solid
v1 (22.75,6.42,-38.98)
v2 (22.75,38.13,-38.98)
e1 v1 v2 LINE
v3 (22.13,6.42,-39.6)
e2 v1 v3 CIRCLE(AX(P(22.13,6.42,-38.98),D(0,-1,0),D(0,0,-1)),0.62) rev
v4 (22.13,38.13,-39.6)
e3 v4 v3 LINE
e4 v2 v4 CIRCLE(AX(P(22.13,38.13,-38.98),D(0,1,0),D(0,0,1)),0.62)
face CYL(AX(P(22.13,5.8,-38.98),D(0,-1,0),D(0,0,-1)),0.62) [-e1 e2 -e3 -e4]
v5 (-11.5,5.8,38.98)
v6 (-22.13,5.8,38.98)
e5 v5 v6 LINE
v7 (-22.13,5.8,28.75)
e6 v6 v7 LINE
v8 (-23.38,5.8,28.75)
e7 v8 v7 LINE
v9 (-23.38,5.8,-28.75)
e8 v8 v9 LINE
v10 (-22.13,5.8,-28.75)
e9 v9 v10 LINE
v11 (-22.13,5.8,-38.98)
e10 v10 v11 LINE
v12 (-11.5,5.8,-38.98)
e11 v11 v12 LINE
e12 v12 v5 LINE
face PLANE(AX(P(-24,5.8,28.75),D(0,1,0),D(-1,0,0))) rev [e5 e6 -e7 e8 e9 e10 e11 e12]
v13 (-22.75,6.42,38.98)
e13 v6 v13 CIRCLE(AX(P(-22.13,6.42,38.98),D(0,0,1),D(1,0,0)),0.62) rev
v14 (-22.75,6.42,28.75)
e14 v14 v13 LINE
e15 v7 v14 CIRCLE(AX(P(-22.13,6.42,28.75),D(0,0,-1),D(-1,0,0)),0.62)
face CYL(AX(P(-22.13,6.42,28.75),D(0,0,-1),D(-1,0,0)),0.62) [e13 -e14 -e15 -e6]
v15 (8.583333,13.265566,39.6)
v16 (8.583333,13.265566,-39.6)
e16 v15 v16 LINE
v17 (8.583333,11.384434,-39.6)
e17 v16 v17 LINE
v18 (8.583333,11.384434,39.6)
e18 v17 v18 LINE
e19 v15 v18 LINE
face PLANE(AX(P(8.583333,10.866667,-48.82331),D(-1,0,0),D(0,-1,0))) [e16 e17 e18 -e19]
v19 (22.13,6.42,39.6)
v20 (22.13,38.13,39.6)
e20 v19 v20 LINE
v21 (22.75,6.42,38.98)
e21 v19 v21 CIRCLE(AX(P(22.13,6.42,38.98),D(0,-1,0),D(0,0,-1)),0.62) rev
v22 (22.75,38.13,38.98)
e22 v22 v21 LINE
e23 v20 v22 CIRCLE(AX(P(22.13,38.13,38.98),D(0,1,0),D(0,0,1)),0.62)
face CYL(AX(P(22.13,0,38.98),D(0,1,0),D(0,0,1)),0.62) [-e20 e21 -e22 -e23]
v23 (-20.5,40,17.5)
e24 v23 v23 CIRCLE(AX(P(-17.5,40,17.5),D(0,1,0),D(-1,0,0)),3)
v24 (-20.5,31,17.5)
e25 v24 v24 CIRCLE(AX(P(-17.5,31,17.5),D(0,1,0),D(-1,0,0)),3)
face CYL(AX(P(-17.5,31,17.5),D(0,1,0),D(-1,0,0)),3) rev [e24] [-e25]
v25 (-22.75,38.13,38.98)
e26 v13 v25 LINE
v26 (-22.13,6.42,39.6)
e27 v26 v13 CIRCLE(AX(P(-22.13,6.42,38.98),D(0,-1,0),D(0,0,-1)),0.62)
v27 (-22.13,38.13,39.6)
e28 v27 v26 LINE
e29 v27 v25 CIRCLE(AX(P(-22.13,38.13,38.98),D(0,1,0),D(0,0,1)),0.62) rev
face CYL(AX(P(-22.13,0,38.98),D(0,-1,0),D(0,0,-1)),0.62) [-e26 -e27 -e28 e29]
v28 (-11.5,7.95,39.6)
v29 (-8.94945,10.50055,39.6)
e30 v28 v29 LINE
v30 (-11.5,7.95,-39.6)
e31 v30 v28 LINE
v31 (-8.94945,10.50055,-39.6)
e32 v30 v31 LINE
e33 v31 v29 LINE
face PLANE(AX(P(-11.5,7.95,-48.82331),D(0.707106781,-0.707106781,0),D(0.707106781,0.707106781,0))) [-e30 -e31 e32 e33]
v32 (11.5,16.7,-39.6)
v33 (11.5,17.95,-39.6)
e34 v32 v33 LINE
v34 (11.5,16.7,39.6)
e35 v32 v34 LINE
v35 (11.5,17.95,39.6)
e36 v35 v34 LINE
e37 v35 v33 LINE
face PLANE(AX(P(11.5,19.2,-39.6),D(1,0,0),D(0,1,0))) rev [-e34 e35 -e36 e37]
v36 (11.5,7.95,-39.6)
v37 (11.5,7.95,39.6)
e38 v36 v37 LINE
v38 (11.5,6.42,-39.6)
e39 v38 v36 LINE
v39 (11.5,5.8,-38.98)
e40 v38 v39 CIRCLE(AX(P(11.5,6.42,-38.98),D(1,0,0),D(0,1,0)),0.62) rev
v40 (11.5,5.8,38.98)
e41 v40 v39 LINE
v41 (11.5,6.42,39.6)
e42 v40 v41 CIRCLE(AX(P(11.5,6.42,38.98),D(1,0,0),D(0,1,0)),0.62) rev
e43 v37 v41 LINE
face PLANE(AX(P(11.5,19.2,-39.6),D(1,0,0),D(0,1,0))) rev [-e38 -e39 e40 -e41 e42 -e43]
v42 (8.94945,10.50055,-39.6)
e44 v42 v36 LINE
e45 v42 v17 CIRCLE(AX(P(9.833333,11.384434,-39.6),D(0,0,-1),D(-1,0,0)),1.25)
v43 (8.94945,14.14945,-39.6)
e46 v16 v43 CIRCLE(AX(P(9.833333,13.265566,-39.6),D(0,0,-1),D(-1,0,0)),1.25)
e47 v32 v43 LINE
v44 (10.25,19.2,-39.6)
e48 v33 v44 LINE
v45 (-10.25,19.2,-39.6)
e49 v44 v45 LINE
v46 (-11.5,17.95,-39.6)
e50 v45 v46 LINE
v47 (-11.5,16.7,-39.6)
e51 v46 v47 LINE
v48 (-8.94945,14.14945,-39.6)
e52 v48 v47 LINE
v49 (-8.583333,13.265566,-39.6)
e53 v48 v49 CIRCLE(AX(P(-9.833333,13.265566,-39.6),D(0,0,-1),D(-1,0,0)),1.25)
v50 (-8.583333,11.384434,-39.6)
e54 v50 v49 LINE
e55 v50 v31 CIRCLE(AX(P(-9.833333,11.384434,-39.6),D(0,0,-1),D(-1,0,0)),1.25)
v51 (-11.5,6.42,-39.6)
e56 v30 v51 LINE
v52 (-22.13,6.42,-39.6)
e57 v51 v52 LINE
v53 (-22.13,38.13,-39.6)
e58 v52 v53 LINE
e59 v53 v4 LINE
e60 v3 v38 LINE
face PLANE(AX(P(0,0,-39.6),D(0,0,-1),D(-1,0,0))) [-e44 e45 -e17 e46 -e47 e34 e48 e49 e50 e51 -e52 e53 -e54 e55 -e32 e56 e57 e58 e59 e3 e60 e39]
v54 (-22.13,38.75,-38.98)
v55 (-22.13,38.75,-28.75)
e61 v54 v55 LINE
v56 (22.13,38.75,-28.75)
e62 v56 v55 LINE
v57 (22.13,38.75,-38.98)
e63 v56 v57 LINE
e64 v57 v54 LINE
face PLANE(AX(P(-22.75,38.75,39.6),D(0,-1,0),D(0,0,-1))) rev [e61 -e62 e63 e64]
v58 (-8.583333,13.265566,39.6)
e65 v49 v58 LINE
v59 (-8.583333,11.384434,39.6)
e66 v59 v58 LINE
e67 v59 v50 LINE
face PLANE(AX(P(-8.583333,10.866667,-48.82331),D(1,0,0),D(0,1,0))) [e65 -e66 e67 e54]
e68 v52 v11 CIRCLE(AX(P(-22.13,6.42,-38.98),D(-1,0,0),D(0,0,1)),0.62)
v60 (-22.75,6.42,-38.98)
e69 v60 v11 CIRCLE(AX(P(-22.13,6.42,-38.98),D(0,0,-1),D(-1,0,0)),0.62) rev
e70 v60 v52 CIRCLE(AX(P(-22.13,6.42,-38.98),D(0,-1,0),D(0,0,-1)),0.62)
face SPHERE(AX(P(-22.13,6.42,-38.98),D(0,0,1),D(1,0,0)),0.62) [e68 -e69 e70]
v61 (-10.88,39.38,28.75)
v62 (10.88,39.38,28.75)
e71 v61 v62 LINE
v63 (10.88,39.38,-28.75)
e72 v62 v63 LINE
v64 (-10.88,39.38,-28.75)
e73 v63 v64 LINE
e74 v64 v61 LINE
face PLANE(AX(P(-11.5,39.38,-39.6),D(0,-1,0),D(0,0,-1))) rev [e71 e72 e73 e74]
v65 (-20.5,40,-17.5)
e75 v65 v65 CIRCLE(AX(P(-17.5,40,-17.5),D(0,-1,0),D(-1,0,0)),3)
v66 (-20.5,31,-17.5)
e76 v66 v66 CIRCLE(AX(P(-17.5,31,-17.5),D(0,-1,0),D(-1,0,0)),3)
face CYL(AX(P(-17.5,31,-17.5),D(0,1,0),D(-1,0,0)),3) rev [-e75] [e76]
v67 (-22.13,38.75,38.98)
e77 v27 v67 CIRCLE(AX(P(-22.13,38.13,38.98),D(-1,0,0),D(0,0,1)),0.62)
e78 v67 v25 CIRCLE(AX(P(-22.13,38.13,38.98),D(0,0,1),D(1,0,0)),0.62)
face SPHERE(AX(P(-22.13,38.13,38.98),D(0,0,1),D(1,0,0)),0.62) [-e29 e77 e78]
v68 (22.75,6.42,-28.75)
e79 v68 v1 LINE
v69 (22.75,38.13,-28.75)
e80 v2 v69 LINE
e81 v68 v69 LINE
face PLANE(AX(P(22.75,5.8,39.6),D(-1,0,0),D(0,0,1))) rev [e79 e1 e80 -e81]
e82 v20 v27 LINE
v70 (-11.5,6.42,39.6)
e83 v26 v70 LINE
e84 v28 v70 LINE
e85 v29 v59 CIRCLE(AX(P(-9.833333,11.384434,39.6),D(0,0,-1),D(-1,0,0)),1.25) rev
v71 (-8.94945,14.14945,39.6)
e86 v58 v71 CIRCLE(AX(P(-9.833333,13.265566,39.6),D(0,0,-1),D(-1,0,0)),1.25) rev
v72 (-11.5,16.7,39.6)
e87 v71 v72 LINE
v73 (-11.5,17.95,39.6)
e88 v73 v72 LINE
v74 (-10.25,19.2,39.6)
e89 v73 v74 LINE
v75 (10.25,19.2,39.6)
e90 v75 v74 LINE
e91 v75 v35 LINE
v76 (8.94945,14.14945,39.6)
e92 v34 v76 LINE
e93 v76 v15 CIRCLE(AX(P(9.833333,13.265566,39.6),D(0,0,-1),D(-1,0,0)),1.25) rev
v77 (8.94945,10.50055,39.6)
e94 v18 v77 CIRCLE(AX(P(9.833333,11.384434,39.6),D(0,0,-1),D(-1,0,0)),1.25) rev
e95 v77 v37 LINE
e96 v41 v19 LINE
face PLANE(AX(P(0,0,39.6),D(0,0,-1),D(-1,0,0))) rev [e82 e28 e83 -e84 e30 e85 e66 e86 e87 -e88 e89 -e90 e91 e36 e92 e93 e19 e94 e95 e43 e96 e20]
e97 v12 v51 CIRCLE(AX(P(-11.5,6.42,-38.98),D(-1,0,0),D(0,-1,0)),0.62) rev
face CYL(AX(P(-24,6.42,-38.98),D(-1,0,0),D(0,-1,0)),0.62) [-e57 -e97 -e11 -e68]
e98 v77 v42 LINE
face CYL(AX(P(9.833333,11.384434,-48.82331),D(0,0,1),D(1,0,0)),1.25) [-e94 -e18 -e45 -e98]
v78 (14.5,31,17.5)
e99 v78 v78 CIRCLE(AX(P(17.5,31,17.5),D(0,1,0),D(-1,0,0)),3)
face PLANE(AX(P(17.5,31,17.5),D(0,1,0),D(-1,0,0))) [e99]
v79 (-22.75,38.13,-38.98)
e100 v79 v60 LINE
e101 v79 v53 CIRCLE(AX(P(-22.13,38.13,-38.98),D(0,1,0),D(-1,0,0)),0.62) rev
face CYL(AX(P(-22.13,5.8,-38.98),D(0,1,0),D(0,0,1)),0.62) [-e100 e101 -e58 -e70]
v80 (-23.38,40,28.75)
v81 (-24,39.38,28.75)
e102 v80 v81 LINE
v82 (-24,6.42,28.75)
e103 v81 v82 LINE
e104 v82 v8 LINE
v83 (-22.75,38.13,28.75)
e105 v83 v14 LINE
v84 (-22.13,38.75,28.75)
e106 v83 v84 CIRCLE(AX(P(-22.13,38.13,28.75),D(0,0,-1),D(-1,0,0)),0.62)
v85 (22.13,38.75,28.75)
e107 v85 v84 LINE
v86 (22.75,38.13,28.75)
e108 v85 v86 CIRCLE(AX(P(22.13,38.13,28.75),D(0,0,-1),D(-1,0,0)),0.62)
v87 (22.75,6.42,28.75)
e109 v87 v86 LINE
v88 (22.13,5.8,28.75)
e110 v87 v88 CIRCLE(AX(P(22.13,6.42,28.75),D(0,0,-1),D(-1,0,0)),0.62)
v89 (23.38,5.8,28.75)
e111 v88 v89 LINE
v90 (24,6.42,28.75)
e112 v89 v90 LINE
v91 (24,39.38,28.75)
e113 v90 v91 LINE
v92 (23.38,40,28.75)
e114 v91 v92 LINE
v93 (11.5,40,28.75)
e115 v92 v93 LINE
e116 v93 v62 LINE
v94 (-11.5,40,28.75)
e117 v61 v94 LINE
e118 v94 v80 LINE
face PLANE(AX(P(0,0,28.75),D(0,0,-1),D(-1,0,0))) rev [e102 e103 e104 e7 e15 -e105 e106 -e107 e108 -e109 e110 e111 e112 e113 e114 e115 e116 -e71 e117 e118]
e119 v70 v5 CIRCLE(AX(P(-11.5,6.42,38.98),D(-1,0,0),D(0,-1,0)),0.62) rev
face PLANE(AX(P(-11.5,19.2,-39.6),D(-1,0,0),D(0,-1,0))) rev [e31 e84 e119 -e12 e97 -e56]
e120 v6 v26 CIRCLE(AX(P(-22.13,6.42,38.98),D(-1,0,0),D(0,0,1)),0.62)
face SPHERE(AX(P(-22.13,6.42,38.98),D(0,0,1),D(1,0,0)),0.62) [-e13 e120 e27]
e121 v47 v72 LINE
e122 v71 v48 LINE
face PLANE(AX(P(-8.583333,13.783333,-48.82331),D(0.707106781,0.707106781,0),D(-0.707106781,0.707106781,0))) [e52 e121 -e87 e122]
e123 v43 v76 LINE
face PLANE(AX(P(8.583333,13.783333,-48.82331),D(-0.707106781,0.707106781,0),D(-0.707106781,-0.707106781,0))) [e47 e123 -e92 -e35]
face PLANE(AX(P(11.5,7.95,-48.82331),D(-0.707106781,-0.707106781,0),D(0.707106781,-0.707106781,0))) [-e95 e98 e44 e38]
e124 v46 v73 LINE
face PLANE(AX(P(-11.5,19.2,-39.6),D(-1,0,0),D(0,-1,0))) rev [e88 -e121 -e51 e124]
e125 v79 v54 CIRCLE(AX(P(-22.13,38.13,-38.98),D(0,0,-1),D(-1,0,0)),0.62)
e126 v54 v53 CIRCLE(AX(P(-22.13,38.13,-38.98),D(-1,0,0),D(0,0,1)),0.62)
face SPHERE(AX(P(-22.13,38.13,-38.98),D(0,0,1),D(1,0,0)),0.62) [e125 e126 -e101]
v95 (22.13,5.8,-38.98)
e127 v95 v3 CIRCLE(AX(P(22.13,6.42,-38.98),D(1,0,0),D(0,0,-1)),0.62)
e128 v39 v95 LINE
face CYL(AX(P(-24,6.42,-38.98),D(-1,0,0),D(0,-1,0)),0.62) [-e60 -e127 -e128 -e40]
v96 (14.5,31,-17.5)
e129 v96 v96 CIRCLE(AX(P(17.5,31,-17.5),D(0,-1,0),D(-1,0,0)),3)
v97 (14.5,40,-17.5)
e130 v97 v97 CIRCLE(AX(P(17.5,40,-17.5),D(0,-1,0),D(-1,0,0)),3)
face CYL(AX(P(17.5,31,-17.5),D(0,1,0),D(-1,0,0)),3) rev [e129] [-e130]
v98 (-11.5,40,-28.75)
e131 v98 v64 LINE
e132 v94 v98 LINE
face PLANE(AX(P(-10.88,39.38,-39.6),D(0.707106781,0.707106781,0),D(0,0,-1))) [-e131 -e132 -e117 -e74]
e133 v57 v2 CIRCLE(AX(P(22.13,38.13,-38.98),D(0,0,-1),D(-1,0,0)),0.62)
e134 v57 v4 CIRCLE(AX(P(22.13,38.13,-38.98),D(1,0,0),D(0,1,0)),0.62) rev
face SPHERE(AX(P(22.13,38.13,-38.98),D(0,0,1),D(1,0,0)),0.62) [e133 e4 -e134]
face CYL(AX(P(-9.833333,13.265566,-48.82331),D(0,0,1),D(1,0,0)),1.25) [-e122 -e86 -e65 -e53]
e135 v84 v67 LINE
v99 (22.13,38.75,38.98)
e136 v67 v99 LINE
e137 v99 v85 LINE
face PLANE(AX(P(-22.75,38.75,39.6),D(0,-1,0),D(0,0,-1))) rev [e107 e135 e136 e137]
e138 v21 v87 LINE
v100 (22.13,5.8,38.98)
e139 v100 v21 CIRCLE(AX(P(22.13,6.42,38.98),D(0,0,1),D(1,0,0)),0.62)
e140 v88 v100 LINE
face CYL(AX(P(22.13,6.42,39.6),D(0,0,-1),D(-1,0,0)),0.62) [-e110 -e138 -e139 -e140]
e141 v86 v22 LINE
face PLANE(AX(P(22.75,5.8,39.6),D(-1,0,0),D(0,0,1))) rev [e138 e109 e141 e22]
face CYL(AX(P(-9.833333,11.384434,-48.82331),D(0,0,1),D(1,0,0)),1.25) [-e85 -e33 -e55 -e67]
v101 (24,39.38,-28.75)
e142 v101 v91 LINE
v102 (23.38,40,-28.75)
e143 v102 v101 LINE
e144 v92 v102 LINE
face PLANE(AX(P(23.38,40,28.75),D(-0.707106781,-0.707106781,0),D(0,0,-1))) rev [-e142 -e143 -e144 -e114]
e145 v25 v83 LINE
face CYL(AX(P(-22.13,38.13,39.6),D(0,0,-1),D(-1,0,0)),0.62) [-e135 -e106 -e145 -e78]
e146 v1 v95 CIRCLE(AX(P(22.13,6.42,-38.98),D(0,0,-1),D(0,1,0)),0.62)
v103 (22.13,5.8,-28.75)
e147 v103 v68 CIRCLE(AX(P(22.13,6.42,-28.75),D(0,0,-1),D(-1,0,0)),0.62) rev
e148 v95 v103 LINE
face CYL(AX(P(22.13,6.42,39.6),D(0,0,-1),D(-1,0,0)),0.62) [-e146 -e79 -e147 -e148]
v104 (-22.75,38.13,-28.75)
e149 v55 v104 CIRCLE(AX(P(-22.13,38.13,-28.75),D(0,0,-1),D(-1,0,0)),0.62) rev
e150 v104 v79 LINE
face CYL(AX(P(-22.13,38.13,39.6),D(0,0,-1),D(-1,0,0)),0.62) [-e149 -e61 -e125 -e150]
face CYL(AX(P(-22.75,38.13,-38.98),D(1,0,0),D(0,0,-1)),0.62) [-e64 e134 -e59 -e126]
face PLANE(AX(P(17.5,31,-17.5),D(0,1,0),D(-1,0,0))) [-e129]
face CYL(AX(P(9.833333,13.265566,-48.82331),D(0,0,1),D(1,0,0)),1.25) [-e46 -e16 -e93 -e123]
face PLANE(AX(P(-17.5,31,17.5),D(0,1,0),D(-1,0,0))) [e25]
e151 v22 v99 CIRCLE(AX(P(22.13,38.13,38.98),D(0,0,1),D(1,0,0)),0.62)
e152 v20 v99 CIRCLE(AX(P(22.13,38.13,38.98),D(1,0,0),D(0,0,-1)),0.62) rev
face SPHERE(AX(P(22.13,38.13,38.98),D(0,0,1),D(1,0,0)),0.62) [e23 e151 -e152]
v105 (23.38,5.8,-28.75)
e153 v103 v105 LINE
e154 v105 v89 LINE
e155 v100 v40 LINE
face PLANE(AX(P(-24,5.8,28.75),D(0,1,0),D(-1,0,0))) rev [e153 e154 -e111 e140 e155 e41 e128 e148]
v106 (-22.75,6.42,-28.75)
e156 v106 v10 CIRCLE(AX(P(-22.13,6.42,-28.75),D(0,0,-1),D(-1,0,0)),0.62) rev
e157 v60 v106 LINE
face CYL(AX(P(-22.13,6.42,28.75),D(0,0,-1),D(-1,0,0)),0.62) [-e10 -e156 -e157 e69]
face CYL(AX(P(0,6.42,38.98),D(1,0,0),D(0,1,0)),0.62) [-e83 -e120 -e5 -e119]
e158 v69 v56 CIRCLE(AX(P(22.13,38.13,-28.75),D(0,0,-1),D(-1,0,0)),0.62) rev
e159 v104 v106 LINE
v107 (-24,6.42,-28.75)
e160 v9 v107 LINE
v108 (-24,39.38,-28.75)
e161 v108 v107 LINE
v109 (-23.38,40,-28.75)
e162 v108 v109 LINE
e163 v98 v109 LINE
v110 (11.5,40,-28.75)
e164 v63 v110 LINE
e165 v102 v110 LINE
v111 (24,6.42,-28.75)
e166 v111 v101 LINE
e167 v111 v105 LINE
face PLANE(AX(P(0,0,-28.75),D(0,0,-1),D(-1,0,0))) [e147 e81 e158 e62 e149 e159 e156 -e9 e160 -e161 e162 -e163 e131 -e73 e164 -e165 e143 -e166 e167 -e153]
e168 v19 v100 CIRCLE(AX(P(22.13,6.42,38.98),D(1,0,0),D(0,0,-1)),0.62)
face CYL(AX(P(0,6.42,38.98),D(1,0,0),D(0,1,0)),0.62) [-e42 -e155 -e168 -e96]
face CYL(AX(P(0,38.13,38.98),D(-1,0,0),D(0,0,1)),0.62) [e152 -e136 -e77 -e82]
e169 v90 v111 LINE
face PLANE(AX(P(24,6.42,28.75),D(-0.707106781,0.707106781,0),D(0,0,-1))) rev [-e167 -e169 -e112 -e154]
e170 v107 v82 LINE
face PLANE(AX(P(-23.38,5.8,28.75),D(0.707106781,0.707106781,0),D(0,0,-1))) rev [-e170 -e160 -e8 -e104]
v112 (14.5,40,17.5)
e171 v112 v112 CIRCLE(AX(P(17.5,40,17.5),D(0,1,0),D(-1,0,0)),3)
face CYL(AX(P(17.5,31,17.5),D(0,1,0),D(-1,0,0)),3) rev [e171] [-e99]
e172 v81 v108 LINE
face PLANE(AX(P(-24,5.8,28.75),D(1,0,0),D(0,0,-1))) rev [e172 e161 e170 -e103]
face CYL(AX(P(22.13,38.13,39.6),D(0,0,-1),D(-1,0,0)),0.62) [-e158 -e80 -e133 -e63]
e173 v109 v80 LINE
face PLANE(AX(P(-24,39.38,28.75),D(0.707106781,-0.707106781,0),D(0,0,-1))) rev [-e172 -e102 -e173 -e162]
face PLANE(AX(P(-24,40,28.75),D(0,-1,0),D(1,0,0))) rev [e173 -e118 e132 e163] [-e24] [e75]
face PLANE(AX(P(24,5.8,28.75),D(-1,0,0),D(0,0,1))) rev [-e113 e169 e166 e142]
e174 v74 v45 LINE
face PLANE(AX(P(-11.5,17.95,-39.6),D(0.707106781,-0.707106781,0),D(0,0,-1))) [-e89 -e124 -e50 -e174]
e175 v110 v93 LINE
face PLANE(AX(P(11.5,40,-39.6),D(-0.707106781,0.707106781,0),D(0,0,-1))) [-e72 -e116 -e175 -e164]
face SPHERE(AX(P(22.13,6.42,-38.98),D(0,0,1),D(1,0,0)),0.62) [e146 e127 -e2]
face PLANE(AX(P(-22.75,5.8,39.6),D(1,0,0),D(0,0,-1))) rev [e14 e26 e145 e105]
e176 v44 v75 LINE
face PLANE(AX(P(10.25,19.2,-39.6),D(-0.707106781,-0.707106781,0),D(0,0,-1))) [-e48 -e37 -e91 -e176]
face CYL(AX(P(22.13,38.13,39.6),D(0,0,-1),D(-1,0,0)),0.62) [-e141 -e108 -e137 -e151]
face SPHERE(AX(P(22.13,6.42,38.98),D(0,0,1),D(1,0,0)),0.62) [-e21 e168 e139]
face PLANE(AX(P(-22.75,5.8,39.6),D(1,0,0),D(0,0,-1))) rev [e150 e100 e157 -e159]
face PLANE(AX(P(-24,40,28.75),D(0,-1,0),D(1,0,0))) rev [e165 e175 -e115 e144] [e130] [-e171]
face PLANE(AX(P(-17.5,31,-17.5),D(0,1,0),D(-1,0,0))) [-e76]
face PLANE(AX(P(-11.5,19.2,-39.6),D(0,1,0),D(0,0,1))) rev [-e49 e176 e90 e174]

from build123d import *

# Parameters (mm, degrees)
SKETCH1_W           = 48
SKETCH1_H           = 34.2
BOSS_EXTRUDE1_DEPTH = 28.75
SKETCH2_W           = 45.5
SKETCH2_H           = 32.95
BOSS_EXTRUDE2_DEPTH = 39.6
SKETCH3_W           = 23
SKETCH3_H           = 19.2
CUT_EXTRUDE1_DEPTH  = 92.916483832
BOSS_EXTRUDE3_DEPTH = 79.2
CHAMFER1_SIZE       = 1.25
FILLET1_R           = 1.25
SKETCH5_W           = 23
SKETCH5_H           = 0.62
CUT_EXTRUDE2_DEPTH  = 83.750966762
CHAMFER2_SIZE       = 0.62
FILLET2_R           = 0.62
SKETCH6_R           = 3
CUT_EXTRUDE3_DEPTH  = 9


with BuildPart() as part:
    # Sketch1 → Boss-Extrude1 (new, symmetric)
    with BuildSketch(Plane.XY):
        with Locations((0, 22.9)):
            Rectangle(SKETCH1_W, SKETCH1_H)
    extrude(amount=BOSS_EXTRUDE1_DEPTH, both=True)

    # Sketch2 → Boss-Extrude2 (add, symmetric)
    with BuildSketch(Plane.XY):
        with Locations((0, 22.275)):
            Rectangle(SKETCH2_W, SKETCH2_H)
    extrude(amount=BOSS_EXTRUDE2_DEPTH, both=True)

    # Sketch3 → Cut-Extrude1 (cut, through all)
    with BuildSketch(Plane.XY.offset(39.6)):
        with Locations((0, 9.6)):
            Rectangle(SKETCH3_W, SKETCH3_H)
    extrude(amount=-CUT_EXTRUDE1_DEPTH, mode=Mode.SUBTRACT)

    # Sketch4 → Boss-Extrude3 (add)
    with BuildSketch(Plane.XY.offset(39.6)):
        Polygon((-11.5, 16.7), (-11.5, 7.95), (-8.583333333, 10.866666667), (-8.583333333, 13.783333333), align=None)
        Polygon((8.583333333, 13.783333333), (11.5, 16.7), (11.5, 7.95), (8.583333333, 10.866666667), align=None)
    extrude(amount=-BOSS_EXTRUDE3_DEPTH)

    # Chamfer1
    chamfer1_edges = [part.edges().sort_by_distance(p)[0] for p in [
        (11.5, 19.2, 0),
        (-11.5, 19.2, 0),
    ]]
    chamfer(chamfer1_edges, length=CHAMFER1_SIZE)

    # Fillet1
    fillet1_edges = [part.edges().sort_by_distance(p)[0] for p in [
        (-8.583333333, 10.866666667, 0),
        (-8.583333333, 13.783333333, 0),
        (8.583333333, 13.783333333, 0),
        (8.583333333, 10.866666667, 0),
    ]]
    fillet(fillet1_edges, radius=FILLET1_R)

    # Sketch5 → Cut-Extrude2 (cut, through all)
    with BuildSketch(Plane.XY.offset(28.75)):
        with Locations((0, 39.69)):
            Rectangle(SKETCH5_W, SKETCH5_H)
    extrude(amount=-CUT_EXTRUDE2_DEPTH, mode=Mode.SUBTRACT)

    # Chamfer2
    chamfer2_edges = [part.edges().sort_by_distance(p)[0] for p in [
        (-11.5, 39.38, 0),
        (11.5, 39.38, 0),
        (24, 5.8, 0),
        (-24, 5.8, 0),
        (-24, 40, 0),
        (24, 40, 0),
    ]]
    chamfer(chamfer2_edges, length=CHAMFER2_SIZE - 0.0001)  # a hair under: the kernel refuses the full size

    # Fillet2
    fillet2_edges = [part.edges().sort_by_distance(p)[0] for p in [
        (-22.75, 38.75, 34.175),
        (-22.75, 5.8, 34.175),
        (22.75, 5.8, 34.175),
        (22.75, 38.75, 34.175),
        (-22.75, 38.75, -34.175),
        (-22.75, 22.275, -39.6),
        (-22.75, 5.8, -34.175),
        (-17.125, 5.8, -39.6),
        (22.75, 5.8, -34.175),
        (22.75, 22.275, -39.6),
        (22.75, 38.75, -34.175),
        (0, 38.75, -39.6),
        (-22.75, 22.275, 39.6),
        (-17.125, 5.8, 39.6),
        (22.75, 22.275, 39.6),
        (0, 38.75, 39.6),
        (17.125, 5.8, 39.6),
        (17.125, 5.8, -39.6),
    ]]
    fillet(fillet2_edges, radius=FILLET2_R)

    # Sketch6 → Cut-Extrude3 (cut)
    with BuildSketch(Plane(origin=(0, 40, 0), x_dir=(1, 0, 0), z_dir=(0, 1, 0))):
        with Locations(Location((-17.5, -17.5, 0), (0, 0, 180))):
            Circle(SKETCH6_R)
        with Locations(Location((17.5, -17.5, 0), (0, 0, 180))):
            Circle(SKETCH6_R)
    cut_extrude3 = extrude(amount=-CUT_EXTRUDE3_DEPTH, mode=Mode.SUBTRACT)

    # Mirror1: Cut-Extrude3 across plane
    add(cut_extrude3.mirror(Plane.XY), mode=Mode.SUBTRACT)


solid = part.part
